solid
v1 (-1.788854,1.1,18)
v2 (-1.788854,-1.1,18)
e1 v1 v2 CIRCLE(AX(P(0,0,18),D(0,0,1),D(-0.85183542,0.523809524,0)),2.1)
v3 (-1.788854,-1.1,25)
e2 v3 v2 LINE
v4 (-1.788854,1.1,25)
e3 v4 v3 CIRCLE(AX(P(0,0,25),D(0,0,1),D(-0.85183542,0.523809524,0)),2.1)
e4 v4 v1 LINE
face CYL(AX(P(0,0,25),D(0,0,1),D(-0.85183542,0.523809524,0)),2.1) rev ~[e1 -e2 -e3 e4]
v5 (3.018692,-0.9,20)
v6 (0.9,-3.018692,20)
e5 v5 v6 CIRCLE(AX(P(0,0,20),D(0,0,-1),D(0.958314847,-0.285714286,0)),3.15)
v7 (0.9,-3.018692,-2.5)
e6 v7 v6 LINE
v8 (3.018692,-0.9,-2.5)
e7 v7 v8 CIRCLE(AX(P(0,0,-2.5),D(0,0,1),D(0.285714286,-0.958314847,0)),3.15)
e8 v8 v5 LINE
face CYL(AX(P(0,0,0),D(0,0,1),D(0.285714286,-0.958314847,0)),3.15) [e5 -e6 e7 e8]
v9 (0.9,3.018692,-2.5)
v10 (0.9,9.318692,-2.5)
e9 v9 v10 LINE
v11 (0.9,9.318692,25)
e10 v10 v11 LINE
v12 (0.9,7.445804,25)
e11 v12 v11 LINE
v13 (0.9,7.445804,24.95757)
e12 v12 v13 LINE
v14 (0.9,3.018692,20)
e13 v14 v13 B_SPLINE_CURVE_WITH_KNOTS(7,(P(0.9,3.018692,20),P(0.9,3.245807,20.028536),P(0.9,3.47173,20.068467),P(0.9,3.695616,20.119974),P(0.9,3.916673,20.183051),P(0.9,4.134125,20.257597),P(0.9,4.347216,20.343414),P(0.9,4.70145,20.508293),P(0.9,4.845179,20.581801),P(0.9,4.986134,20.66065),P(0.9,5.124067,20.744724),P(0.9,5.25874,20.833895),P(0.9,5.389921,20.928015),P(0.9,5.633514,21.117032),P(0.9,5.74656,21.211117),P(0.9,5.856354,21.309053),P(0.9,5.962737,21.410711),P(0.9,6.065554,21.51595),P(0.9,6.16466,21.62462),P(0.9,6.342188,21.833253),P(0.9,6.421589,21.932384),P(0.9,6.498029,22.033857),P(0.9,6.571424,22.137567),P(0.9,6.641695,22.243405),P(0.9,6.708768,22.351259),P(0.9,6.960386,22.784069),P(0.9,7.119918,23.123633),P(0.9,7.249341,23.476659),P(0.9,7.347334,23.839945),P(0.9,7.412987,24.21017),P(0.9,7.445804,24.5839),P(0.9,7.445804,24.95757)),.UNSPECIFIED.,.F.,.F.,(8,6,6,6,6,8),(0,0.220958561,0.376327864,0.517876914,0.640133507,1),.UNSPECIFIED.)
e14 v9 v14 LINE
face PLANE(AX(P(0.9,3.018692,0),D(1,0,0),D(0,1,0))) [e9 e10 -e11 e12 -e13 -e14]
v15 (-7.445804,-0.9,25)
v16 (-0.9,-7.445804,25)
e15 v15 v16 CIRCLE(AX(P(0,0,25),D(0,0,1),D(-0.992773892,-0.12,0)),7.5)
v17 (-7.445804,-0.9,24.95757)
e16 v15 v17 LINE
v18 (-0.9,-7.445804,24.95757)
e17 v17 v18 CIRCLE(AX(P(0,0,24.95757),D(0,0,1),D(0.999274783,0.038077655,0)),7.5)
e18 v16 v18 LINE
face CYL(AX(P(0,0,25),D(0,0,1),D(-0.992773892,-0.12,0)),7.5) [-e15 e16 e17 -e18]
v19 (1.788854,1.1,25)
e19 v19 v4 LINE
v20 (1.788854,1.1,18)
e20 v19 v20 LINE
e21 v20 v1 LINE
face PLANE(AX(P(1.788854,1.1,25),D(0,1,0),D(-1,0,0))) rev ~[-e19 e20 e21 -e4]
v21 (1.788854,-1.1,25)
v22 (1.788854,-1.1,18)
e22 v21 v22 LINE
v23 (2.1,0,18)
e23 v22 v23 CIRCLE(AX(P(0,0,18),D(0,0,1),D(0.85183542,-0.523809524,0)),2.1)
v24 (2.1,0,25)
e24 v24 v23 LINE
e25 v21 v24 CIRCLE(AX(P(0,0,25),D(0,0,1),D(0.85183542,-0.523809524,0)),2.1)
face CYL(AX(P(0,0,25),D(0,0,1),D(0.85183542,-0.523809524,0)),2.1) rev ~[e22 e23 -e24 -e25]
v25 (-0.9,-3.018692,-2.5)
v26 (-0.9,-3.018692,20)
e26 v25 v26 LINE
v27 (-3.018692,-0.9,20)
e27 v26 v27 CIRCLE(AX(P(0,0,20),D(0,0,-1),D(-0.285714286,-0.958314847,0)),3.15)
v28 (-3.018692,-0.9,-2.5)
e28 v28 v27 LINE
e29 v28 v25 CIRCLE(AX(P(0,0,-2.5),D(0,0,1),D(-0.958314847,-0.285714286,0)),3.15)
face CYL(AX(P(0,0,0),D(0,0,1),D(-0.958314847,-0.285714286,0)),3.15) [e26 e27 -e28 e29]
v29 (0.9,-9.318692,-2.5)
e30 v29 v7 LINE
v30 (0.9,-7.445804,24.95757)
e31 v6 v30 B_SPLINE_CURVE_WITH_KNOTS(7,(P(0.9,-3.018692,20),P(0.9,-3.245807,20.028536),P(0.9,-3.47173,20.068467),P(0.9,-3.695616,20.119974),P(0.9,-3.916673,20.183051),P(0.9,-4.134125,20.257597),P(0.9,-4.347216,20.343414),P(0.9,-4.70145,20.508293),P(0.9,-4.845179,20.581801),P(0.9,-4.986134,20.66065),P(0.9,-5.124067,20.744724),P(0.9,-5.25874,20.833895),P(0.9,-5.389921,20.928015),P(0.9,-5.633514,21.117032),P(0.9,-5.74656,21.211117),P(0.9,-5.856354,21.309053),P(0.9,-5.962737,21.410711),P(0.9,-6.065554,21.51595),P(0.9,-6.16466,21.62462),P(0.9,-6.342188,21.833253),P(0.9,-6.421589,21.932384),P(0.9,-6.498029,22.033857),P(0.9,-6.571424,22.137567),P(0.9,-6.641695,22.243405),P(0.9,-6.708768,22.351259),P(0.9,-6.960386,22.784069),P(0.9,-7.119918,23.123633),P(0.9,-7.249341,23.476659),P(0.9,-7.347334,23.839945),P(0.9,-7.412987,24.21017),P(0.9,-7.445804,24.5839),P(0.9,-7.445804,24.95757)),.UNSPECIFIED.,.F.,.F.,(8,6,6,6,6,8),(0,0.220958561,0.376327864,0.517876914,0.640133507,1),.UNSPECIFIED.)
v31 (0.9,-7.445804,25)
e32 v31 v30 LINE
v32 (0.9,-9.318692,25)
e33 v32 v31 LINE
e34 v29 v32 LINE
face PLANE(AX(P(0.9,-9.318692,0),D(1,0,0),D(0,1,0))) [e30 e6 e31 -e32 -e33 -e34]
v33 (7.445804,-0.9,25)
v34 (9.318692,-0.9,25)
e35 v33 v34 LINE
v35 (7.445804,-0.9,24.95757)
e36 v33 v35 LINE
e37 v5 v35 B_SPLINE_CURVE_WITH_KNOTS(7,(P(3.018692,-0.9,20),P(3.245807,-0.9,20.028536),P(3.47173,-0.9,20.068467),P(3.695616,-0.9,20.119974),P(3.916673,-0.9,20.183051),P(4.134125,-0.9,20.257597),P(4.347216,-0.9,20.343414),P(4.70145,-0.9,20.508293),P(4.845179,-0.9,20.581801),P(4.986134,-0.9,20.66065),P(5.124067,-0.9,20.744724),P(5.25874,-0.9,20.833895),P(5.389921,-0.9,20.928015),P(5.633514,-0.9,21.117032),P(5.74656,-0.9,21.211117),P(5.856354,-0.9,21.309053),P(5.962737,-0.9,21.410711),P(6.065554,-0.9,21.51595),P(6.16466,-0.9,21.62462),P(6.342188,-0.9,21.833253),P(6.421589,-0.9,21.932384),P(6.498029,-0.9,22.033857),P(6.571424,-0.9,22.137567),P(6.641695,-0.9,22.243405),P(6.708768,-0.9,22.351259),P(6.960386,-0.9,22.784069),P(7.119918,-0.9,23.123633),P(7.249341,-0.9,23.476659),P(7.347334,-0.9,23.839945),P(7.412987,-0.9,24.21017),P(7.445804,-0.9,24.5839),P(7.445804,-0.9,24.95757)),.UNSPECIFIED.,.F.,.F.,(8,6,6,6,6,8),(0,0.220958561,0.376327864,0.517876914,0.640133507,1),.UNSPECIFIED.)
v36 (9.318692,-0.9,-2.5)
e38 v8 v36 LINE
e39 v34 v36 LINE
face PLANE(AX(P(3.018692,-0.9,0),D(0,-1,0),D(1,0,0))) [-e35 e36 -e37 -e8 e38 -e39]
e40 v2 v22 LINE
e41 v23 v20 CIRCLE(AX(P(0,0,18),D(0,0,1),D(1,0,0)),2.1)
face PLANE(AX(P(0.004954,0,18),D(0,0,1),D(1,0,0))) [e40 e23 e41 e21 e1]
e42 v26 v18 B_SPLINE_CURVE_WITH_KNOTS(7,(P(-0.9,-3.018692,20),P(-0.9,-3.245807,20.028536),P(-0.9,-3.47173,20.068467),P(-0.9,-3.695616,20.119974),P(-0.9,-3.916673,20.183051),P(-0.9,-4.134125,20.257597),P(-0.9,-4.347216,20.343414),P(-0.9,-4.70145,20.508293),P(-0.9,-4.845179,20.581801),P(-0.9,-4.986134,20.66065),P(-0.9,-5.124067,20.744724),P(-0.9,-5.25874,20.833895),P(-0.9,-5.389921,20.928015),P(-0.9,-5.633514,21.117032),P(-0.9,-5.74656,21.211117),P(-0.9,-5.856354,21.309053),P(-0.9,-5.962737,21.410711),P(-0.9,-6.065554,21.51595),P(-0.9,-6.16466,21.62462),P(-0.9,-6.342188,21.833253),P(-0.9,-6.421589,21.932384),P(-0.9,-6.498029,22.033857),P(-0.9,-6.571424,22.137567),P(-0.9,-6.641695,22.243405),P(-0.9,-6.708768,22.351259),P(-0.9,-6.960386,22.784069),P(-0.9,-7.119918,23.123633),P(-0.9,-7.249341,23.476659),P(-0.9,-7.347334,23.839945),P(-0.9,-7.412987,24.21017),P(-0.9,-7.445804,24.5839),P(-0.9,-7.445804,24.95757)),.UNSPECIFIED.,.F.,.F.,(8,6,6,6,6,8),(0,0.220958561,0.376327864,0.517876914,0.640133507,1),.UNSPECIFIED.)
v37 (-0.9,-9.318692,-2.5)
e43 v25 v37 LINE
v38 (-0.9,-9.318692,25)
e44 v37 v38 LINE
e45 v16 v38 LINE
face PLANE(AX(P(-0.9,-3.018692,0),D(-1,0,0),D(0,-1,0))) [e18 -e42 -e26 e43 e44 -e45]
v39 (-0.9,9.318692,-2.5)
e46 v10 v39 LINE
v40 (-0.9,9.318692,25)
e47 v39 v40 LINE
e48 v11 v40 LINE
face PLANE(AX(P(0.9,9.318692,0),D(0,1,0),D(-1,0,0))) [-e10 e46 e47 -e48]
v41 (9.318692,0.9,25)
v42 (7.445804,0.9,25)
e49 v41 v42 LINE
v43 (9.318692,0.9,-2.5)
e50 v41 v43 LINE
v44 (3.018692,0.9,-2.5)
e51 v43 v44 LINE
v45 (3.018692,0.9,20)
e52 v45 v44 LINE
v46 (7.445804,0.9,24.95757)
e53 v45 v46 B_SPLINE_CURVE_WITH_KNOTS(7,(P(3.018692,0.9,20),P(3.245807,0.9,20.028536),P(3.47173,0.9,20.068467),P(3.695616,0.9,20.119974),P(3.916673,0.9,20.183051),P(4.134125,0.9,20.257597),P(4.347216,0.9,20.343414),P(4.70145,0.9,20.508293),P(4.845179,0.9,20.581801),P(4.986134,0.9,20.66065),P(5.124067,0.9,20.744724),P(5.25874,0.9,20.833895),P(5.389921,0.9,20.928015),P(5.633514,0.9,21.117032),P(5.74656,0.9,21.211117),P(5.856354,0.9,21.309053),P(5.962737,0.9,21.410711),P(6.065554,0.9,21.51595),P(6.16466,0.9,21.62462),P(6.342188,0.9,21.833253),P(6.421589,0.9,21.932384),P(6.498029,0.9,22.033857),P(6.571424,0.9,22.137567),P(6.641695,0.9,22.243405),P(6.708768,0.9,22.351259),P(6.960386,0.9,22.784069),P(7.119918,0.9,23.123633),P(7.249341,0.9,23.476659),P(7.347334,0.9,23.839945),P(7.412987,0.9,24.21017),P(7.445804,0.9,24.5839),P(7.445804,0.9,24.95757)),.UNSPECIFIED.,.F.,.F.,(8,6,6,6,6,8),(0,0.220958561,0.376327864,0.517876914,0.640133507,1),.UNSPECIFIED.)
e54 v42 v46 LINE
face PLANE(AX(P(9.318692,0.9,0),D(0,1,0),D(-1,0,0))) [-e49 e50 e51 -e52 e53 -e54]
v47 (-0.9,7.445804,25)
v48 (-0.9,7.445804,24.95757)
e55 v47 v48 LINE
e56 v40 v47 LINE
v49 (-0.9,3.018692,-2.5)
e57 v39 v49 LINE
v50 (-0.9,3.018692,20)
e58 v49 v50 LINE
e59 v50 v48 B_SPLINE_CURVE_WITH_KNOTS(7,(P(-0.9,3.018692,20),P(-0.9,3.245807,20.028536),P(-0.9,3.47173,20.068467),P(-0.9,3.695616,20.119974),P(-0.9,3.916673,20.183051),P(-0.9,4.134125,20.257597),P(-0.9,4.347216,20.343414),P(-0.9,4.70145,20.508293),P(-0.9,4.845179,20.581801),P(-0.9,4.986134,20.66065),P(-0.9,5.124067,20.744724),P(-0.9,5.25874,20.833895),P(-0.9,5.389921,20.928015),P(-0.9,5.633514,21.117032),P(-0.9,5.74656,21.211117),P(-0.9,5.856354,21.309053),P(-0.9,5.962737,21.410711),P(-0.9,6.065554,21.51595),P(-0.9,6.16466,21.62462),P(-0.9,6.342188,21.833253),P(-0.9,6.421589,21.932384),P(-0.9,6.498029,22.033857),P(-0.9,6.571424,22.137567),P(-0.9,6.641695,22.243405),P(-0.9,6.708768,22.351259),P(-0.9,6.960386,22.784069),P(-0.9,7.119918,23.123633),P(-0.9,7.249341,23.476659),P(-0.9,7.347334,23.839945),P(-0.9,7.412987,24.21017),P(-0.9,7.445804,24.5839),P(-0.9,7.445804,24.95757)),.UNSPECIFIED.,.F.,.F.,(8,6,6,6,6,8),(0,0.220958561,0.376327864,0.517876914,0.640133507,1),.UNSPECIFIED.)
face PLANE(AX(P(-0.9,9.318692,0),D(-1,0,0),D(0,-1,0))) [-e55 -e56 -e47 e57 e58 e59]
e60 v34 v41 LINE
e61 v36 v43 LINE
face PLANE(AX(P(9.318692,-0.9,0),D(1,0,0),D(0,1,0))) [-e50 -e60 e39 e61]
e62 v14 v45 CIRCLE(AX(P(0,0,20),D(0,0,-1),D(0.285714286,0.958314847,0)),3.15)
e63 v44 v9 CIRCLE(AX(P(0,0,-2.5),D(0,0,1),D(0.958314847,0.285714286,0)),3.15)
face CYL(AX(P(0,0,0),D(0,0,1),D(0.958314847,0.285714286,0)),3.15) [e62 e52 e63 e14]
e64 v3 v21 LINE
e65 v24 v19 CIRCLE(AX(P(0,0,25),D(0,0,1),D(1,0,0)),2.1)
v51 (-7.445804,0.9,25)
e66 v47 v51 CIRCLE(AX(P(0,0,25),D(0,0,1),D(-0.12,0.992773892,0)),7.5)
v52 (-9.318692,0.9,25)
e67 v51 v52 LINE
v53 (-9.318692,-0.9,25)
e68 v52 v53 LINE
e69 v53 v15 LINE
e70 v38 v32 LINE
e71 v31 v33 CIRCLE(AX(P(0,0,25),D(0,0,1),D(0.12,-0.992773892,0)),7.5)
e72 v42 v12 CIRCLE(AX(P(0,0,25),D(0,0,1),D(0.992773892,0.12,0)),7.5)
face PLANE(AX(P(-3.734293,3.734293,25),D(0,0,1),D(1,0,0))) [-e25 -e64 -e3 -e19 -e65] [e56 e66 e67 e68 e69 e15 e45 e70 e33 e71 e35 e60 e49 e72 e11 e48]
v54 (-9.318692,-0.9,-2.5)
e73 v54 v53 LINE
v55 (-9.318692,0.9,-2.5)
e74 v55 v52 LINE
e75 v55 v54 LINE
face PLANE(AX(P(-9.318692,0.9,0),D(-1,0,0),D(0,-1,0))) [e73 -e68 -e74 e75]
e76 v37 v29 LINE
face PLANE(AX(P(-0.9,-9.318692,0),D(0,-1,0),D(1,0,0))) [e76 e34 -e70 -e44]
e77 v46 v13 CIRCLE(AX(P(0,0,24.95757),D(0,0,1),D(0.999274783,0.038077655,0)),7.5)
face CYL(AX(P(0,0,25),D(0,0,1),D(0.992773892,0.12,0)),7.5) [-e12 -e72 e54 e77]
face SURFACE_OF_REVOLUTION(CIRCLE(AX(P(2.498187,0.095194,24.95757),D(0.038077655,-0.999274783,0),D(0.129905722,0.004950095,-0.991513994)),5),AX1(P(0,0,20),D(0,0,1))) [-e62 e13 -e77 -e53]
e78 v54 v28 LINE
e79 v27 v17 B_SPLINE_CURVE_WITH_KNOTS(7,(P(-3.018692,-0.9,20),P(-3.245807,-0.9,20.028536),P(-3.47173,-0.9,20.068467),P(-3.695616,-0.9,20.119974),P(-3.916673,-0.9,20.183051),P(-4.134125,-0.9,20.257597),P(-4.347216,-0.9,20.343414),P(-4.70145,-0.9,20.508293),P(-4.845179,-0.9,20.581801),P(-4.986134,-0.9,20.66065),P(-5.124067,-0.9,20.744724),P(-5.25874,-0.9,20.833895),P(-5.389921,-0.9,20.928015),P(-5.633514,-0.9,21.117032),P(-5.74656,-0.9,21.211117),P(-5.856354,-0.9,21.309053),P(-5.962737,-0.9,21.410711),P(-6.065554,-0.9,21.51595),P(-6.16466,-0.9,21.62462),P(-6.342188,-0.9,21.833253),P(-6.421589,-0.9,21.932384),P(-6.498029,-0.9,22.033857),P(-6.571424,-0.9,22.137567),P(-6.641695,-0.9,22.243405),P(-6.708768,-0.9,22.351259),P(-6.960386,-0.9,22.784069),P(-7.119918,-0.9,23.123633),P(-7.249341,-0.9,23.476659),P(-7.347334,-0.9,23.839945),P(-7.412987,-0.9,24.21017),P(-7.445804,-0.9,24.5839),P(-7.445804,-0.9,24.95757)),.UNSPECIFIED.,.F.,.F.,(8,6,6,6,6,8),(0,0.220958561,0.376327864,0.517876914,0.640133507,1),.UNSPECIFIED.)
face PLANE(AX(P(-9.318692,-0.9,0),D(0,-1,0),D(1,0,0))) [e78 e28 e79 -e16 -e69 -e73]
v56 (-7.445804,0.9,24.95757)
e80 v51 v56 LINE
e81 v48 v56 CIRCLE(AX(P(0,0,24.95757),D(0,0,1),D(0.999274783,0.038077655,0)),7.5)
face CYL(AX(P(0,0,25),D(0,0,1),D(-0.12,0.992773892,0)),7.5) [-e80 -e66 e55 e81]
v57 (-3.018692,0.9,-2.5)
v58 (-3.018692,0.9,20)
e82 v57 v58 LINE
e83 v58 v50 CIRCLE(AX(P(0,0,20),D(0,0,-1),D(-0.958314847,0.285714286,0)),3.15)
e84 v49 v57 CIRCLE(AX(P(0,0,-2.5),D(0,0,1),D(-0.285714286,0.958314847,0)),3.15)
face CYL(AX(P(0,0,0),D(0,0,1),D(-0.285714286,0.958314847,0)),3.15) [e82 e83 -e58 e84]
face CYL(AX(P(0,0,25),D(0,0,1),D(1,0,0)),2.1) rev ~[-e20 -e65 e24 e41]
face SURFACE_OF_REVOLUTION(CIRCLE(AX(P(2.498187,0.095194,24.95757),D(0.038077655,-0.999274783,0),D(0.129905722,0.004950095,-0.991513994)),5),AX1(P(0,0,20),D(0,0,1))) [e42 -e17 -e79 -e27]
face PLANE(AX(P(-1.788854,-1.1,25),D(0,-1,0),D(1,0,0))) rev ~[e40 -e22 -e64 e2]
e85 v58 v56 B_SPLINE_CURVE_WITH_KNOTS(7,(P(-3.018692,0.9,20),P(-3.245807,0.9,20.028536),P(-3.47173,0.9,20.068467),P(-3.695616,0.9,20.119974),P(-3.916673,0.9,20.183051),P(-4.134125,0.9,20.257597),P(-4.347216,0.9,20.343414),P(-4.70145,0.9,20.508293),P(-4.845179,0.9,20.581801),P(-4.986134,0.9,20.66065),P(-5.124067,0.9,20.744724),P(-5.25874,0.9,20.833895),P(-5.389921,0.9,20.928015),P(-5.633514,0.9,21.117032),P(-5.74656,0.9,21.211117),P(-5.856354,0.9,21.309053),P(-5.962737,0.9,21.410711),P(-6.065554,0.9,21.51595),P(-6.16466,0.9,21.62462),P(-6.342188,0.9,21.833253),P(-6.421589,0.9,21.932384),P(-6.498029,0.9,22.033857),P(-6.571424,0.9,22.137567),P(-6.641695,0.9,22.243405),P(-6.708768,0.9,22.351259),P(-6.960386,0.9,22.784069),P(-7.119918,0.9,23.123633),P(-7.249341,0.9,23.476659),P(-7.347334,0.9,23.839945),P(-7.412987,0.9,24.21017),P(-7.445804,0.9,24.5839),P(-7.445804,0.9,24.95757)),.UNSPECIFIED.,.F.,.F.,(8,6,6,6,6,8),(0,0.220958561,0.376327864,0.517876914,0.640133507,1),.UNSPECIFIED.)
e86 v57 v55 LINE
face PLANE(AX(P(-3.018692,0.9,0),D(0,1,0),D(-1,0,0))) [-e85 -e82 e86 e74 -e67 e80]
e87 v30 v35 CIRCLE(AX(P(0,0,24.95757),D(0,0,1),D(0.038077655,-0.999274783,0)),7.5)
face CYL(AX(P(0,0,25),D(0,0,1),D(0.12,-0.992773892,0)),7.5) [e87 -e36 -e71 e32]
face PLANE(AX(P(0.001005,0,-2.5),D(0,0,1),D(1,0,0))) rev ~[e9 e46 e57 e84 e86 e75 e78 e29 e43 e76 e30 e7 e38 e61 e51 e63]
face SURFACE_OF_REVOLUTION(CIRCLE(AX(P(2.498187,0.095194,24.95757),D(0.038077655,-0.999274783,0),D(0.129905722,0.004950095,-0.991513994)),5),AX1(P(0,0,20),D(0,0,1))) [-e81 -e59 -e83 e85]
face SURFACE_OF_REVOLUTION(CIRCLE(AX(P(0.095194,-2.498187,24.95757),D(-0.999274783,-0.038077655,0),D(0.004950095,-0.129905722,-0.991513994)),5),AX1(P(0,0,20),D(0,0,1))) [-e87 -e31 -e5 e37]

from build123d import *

# Parameters (mm, degrees)
F1_DEPTH     = 25
F3_DEPTH     = 7
F6_DEPTH     = 5
F7_DEPTH     = 2.5
F8_T4_ANGLE  = 265.6355670682
F8_T10_ANGLE = 265.6355670682
F8_T16_ANGLE = 265.6355670682
F8_T22_ANGLE = 265.6355670682
F8_T28_ANGLE = 265.6355670682
F8_T34_ANGLE = 265.6355670682
F8_T40_ANGLE = 265.6355670681
F8_T46_ANGLE = 265.6355670681
F8_T52_ANGLE = 265.6355670681
F8_T58_ANGLE = 265.6355670682
F8_T64_ANGLE = 265.6355670682
F8_T70_ANGLE = 265.6355670682


# Not quite as in the source:
# - a fillet or chamfer that OpenCascade refuses, or shapes differently, is made with other operations: its cross-section is extruded or revolved along the edge and cut away or added


with BuildPart() as f1:
    # F0 (on Top) → F1 (new body)
    with BuildSketch(Plane.XY):
        with BuildLine():
            ThreePointArc((3.0186917696, -0.9), (3.1170000862, -0.4547641838), (3.15, 0))
            ThreePointArc((3.15, 0), (3.1170000862, 0.4547641838), (3.0186917696, 0.9))
            ThreePointArc((3.0186917696, 0.9), (2.2273863607, 2.2273863607), (0.9, 3.0186917696))
            ThreePointArc((0.9, 3.0186917696), (0, 3.15), (-0.9, 3.0186917696))
            ThreePointArc((-0.9, 3.0186917696), (-2.2273863607, 2.2273863607), (-3.0186917696, 0.9))
            ThreePointArc((-3.0186917696, 0.9), (-3.15, 0), (-3.0186917696, -0.9))
            ThreePointArc((-3.0186917696, -0.9), (-2.2273863607, -2.2273863607), (-0.9, -3.0186917696))
            ThreePointArc((-0.9, -3.0186917696), (0, -3.15), (0.9, -3.0186917696))
            ThreePointArc((0.9, -3.0186917696), (2.2273863607, -2.2273863607), (3.0186917696, -0.9))
        make_face()
        with BuildLine():
            ThreePointArc((3.0186917696, 0.9), (3.1170000862, 0.4547641838), (3.15, 0))
            ThreePointArc((3.15, 0), (3.1170000862, -0.4547641838), (3.0186917696, -0.9))
            Line((3.0186917696, -0.9), (9.3186917696, -0.9))
            Line((9.3186917696, -0.9), (9.3186917696, 0.9))
            Line((9.3186917696, 0.9), (3.0186917696, 0.9))
        make_face()
        with BuildLine():
            ThreePointArc((-0.9, 3.0186917696), (0, 3.15), (0.9, 3.0186917696))
            Line((0.9, 3.0186917696), (0.9, 9.3186917696))
            Line((0.9, 9.3186917696), (-0.9, 9.3186917696))
            Line((-0.9, 9.3186917696), (-0.9, 3.0186917696))
        make_face()
        with BuildLine():
            Line((0.9, -9.3186917696), (0.9, -3.0186917696))
            ThreePointArc((0.9, -3.0186917696), (0, -3.15), (-0.9, -3.0186917696))
            Line((-0.9, -3.0186917696), (-0.9, -9.3186917696))
            Line((-0.9, -9.3186917696), (0.9, -9.3186917696))
        make_face()
        with BuildLine():
            ThreePointArc((-3.0186917696, -0.9), (-3.15, 0), (-3.0186917696, 0.9))
            Line((-3.0186917696, 0.9), (-9.3186917696, 0.9))
            Line((-9.3186917696, 0.9), (-9.3186917696, -0.9))
            Line((-9.3186917696, -0.9), (-3.0186917696, -0.9))
        make_face()
    extrude(amount=F1_DEPTH)

    # F2 (on face) → F3 (cut)
    with BuildSketch(Plane.XY.offset(25)):
        with BuildLine():
            ThreePointArc((1.788854382, -1.1), (2.020716977, -0.5715793024), (2.1, 0))
            ThreePointArc((2.1, 0), (2.020716977, 0.5715793024), (1.788854382, 1.1))
            Line((1.788854382, 1.1), (-1.788854382, 1.1))
            ThreePointArc((-1.788854382, 1.1), (-2.1, 0), (-1.788854382, -1.1))
            Line((-1.788854382, -1.1), (1.788854382, -1.1))
        make_face()
    extrude(amount=-F3_DEPTH, mode=Mode.SUBTRACT)

    # F5 (on face) → F6 (join)
    with BuildSketch(Plane.XY.offset(25)):
        with BuildLine():
            Line((-0.9, 3.0186917696), (-0.9, 7.4458041876))
            ThreePointArc((-0.9, 7.4458041876), (-5.3033008589, 5.3033008589), (-7.4458041876, 0.9))
            Line((-7.4458041876, 0.9), (-3.0186917696, 0.9))
            ThreePointArc((-3.0186917696, 0.9), (-2.2273863607, 2.2273863607), (-0.9, 3.0186917696))
        make_face()
        with BuildLine():
            ThreePointArc((-7.4458041876, -0.9), (-5.3033008589, -5.3033008589), (-0.9, -7.4458041876))
            Line((-0.9, -7.4458041876), (-0.9, -3.0186917696))
            ThreePointArc((-0.9, -3.0186917696), (-2.2273863607, -2.2273863607), (-3.0186917696, -0.9))
            Line((-3.0186917696, -0.9), (-7.4458041876, -0.9))
        make_face()
        with BuildLine():
            ThreePointArc((0.9, -7.4458041876), (5.3033008589, -5.3033008589), (7.4458041876, -0.9))
            Line((7.4458041876, -0.9), (3.0186917696, -0.9))
            ThreePointArc((3.0186917696, -0.9), (2.2273863607, -2.2273863607), (0.9, -3.0186917696))
            Line((0.9, -3.0186917696), (0.9, -7.4458041876))
        make_face()
        with BuildLine():
            Line((3.0186917696, 0.9), (7.4458041876, 0.9))
            ThreePointArc((7.4458041876, 0.9), (5.3033008589, 5.3033008589), (0.9, 7.4458041876))
            Line((0.9, 7.4458041876), (0.9, 3.0186917696))
            ThreePointArc((0.9, 3.0186917696), (2.2273863607, 2.2273863607), (3.0186917696, 0.9))
        make_face()
    extrude(amount=-F6_DEPTH)

    # F7 (add): a face of the model
    f7_faces = [f1.faces().sort_by_distance(p)[0] for p in [
        (0, 0, 0),
    ]]
    extrude(f7_faces, amount=F7_DEPTH)

    # F8: fillet of radius 5 on 4 edges, made by hand


with BuildPart() as f8_tool2:
    # F8_s3 → F8_t4 (revolve)
    with BuildSketch(Plane(origin=(0, 0, 0), x_dir=(0, 0, 1), z_dir=(0.0380776548, -0.9992747831, 0))):
        with BuildLine():
            ThreePointArc((20, -3.15), (21.6598434797, -6.2583240946), (24.9575699692, -7.5))
            Line((24.9575699692, -7.5), (20, -7.5))
            Line((20, -7.5), (20, -3.15))
        make_face()
    revolve(axis=Axis((0, 0, 20), (0, 0, 1)), revolution_arc=F8_T4_ANGLE)

    split(bisect_by=Plane.XZ.offset(-0.9), keep=Keep.BOTTOM)

    split(bisect_by=Plane.YZ.offset(0.9), keep=Keep.TOP)


with BuildPart() as f1_1:
    add(f1.part)

    # F8_t1: cut F8_tool2
    add(f8_tool2.part, mode=Mode.SUBTRACT)


with BuildPart() as f8_tool8:
    # F8_s9 → F8_t10 (revolve)
    with BuildSketch(Plane(origin=(0, 0, 0), x_dir=(0, 0, 1), z_dir=(0.0380776548, -0.9992747831, 0))):
        with BuildLine():
            ThreePointArc((20, -3.15), (21.6598434797, -6.2583240946), (24.9575699692, -7.5))
            Line((24.9575699692, -7.5), (20, -7.5))
            Line((20, -7.5), (20, -3.15))
        make_face()
    revolve(axis=Axis((0, 0, 20), (0, 0, 1)), revolution_arc=F8_T10_ANGLE)

    split(bisect_by=Plane.YZ.offset(-0.9), keep=Keep.BOTTOM)

    split(bisect_by=Plane.XZ.offset(-0.9), keep=Keep.BOTTOM)


with BuildPart() as f1_2:
    add(f1_1.part)

    # F8_t7: cut F8_tool8
    add(f8_tool8.part, mode=Mode.SUBTRACT)


with BuildPart() as f8_tool14:
    # F8_s15 → F8_t16 (revolve)
    with BuildSketch(Plane(origin=(0, 0, 0), x_dir=(0, 0, 1), z_dir=(0.0380776548, -0.9992747831, 0))):
        with BuildLine():
            ThreePointArc((20, -3.15), (21.6598434797, -6.2583240946), (24.9575699692, -7.5))
            Line((24.9575699692, -7.5), (20, -7.5))
            Line((20, -7.5), (20, -3.15))
        make_face()
    revolve(axis=Axis((0, 0, 20), (0, 0, 1)), revolution_arc=F8_T16_ANGLE)

    split(bisect_by=Plane.YZ.offset(-0.9), keep=Keep.BOTTOM)

    split(bisect_by=Plane.XZ.offset(0.9), keep=Keep.TOP)


with BuildPart() as f1_3:
    add(f1_2.part)

    # F8_t13: cut F8_tool14
    add(f8_tool14.part, mode=Mode.SUBTRACT)


with BuildPart() as f8_tool20:
    # F8_s21 → F8_t22 (revolve)
    with BuildSketch(Plane(origin=(0, 0, 0), x_dir=(0, 0, 1), z_dir=(-0.9992747831, -0.0380776548, 0))):
        with BuildLine():
            ThreePointArc((20, -3.15), (21.6598434797, -6.2583240946), (24.9575699692, -7.5))
            Line((24.9575699692, -7.5), (20, -7.5))
            Line((20, -7.5), (20, -3.15))
        make_face()
    revolve(axis=Axis((0, 0, 20), (0, 0, 1)), revolution_arc=F8_T22_ANGLE)

    split(bisect_by=Plane.XZ.offset(0.9), keep=Keep.TOP)

    split(bisect_by=Plane.YZ.offset(0.9), keep=Keep.TOP)


with BuildPart() as f1_4:
    add(f1_3.part)

    # F8_t19: cut F8_tool20
    add(f8_tool20.part, mode=Mode.SUBTRACT)


with BuildPart() as f8_tool26:
    # F8_s27 → F8_t28 (revolve)
    with BuildSketch(Plane(origin=(0, 0, 0), x_dir=(0, 0, 1), z_dir=(-0.9992747831, -0.0380776548, 0))):
        with BuildLine():
            ThreePointArc((20, -3.15), (21.6598434797, -6.2583240946), (24.9575699692, -7.5))
            Line((24.9575699692, -7.5), (20, -7.5))
            Line((20, -7.5), (20, -3.15))
        make_face()
    revolve(axis=Axis((0, 0, 20), (0, 0, 1)), revolution_arc=F8_T28_ANGLE)

    split(bisect_by=Plane.YZ.offset(0.9), keep=Keep.TOP)

    split(bisect_by=Plane.XZ.offset(-0.9), keep=Keep.BOTTOM)


with BuildPart() as f1_5:
    add(f1_4.part)

    # F8_t25: cut F8_tool26
    add(f8_tool26.part, mode=Mode.SUBTRACT)


with BuildPart() as f8_tool32:
    # F8_s33 → F8_t34 (revolve)
    with BuildSketch(Plane(origin=(0, 0, 0), x_dir=(0, 0, 1), z_dir=(-0.9992747831, -0.0380776548, 0))):
        with BuildLine():
            ThreePointArc((20, -3.15), (21.6598434797, -6.2583240946), (24.9575699692, -7.5))
            Line((24.9575699692, -7.5), (20, -7.5))
            Line((20, -7.5), (20, -3.15))
        make_face()
    revolve(axis=Axis((0, 0, 20), (0, 0, 1)), revolution_arc=F8_T34_ANGLE)

    split(bisect_by=Plane.XZ.offset(-0.9), keep=Keep.BOTTOM)

    split(bisect_by=Plane.YZ.offset(-0.9), keep=Keep.BOTTOM)


with BuildPart() as f1_6:
    add(f1_5.part)

    # F8_t31: cut F8_tool32
    add(f8_tool32.part, mode=Mode.SUBTRACT)


with BuildPart() as f8_tool38:
    # F8_s39 → F8_t40 (revolve)
    with BuildSketch(Plane(origin=(0, 0, 0), x_dir=(0, 0, 1), z_dir=(0.9992747831, 0.0380776548, 0))):
        with BuildLine():
            ThreePointArc((20, -3.15), (21.6598434797, -6.2583240946), (24.9575699692, -7.5))
            Line((24.9575699692, -7.5), (20, -7.5))
            Line((20, -7.5), (20, -3.15))
        make_face()
    revolve(axis=Axis((0, 0, 20), (0, 0, 1)), revolution_arc=F8_T40_ANGLE)

    split(bisect_by=Plane.YZ.offset(-0.9), keep=Keep.BOTTOM)

    split(bisect_by=Plane.XZ.offset(-0.9), keep=Keep.BOTTOM)


with BuildPart() as f1_7:
    add(f1_6.part)

    # F8_t37: cut F8_tool38
    add(f8_tool38.part, mode=Mode.SUBTRACT)


with BuildPart() as f8_tool44:
    # F8_s45 → F8_t46 (revolve)
    with BuildSketch(Plane(origin=(0, 0, 0), x_dir=(0, 0, 1), z_dir=(0.9992747831, 0.0380776548, 0))):
        with BuildLine():
            ThreePointArc((20, -3.15), (21.6598434797, -6.2583240946), (24.9575699692, -7.5))
            Line((24.9575699692, -7.5), (20, -7.5))
            Line((20, -7.5), (20, -3.15))
        make_face()
    revolve(axis=Axis((0, 0, 20), (0, 0, 1)), revolution_arc=F8_T46_ANGLE)

    split(bisect_by=Plane.XZ.offset(0.9), keep=Keep.TOP)

    split(bisect_by=Plane.YZ.offset(-0.9), keep=Keep.BOTTOM)


with BuildPart() as f1_8:
    add(f1_7.part)

    # F8_t43: cut F8_tool44
    add(f8_tool44.part, mode=Mode.SUBTRACT)


with BuildPart() as f8_tool50:
    # F8_s51 → F8_t52 (revolve)
    with BuildSketch(Plane(origin=(0, 0, 0), x_dir=(0, 0, 1), z_dir=(0.9992747831, 0.0380776548, 0))):
        with BuildLine():
            ThreePointArc((20, -3.15), (21.6598434797, -6.2583240946), (24.9575699692, -7.5))
            Line((24.9575699692, -7.5), (20, -7.5))
            Line((20, -7.5), (20, -3.15))
        make_face()
    revolve(axis=Axis((0, 0, 20), (0, 0, 1)), revolution_arc=F8_T52_ANGLE)

    split(bisect_by=Plane.XZ.offset(0.9), keep=Keep.TOP)

    split(bisect_by=Plane.YZ.offset(0.9), keep=Keep.TOP)


with BuildPart() as f1_9:
    add(f1_8.part)

    # F8_t49: cut F8_tool50
    add(f8_tool50.part, mode=Mode.SUBTRACT)


with BuildPart() as f8_tool56:
    # F8_s57 → F8_t58 (revolve)
    with BuildSketch(Plane(origin=(0, 0, 0), x_dir=(0, 0, 1), z_dir=(-0.0380776548, 0.9992747831, 0))):
        with BuildLine():
            ThreePointArc((24.9575699692, -7.5), (21.6598434797, -6.2583240946), (20, -3.15))
            Line((20, -3.15), (20, -7.5))
            Line((20, -7.5), (24.9575699692, -7.5))
        make_face()
    revolve(axis=Axis((0, 0, 20), (0, 0, 1)), revolution_arc=F8_T58_ANGLE)

    split(bisect_by=Plane.XZ.offset(0.9), keep=Keep.TOP)

    split(bisect_by=Plane.YZ.offset(-0.9), keep=Keep.BOTTOM)


with BuildPart() as f1_10:
    add(f1_9.part)

    # F8_t55: cut F8_tool56
    add(f8_tool56.part, mode=Mode.SUBTRACT)


with BuildPart() as f8_tool62:
    # F8_s63 → F8_t64 (revolve)
    with BuildSketch(Plane(origin=(0, 0, 0), x_dir=(0, 0, 1), z_dir=(-0.0380776548, 0.9992747831, 0))):
        with BuildLine():
            ThreePointArc((24.9575699692, -7.5), (21.6598434797, -6.2583240946), (20, -3.15))
            Line((20, -3.15), (20, -7.5))
            Line((20, -7.5), (24.9575699692, -7.5))
        make_face()
    revolve(axis=Axis((0, 0, 20), (0, 0, 1)), revolution_arc=F8_T64_ANGLE)

    split(bisect_by=Plane.XZ.offset(0.9), keep=Keep.TOP)

    split(bisect_by=Plane.YZ.offset(0.9), keep=Keep.TOP)


with BuildPart() as f1_11:
    add(f1_10.part)

    # F8_t61: cut F8_tool62
    add(f8_tool62.part, mode=Mode.SUBTRACT)


with BuildPart() as f8_tool68:
    # F8_s69 → F8_t70 (revolve)
    with BuildSketch(Plane(origin=(0, 0, 0), x_dir=(0, 0, 1), z_dir=(-0.0380776548, 0.9992747831, 0))):
        with BuildLine():
            ThreePointArc((24.9575699692, -7.5), (21.6598434797, -6.2583240946), (20, -3.15))
            Line((20, -3.15), (20, -7.5))
            Line((20, -7.5), (24.9575699692, -7.5))
        make_face()
    revolve(axis=Axis((0, 0, 20), (0, 0, 1)), revolution_arc=F8_T70_ANGLE)

    split(bisect_by=Plane.YZ.offset(0.9), keep=Keep.TOP)

    split(bisect_by=Plane.XZ.offset(-0.9), keep=Keep.BOTTOM)


with BuildPart() as f1_12:
    add(f1_11.part)

    # F8_t67: cut F8_tool68
    add(f8_tool68.part, mode=Mode.SUBTRACT)


solid = f1_12.part
